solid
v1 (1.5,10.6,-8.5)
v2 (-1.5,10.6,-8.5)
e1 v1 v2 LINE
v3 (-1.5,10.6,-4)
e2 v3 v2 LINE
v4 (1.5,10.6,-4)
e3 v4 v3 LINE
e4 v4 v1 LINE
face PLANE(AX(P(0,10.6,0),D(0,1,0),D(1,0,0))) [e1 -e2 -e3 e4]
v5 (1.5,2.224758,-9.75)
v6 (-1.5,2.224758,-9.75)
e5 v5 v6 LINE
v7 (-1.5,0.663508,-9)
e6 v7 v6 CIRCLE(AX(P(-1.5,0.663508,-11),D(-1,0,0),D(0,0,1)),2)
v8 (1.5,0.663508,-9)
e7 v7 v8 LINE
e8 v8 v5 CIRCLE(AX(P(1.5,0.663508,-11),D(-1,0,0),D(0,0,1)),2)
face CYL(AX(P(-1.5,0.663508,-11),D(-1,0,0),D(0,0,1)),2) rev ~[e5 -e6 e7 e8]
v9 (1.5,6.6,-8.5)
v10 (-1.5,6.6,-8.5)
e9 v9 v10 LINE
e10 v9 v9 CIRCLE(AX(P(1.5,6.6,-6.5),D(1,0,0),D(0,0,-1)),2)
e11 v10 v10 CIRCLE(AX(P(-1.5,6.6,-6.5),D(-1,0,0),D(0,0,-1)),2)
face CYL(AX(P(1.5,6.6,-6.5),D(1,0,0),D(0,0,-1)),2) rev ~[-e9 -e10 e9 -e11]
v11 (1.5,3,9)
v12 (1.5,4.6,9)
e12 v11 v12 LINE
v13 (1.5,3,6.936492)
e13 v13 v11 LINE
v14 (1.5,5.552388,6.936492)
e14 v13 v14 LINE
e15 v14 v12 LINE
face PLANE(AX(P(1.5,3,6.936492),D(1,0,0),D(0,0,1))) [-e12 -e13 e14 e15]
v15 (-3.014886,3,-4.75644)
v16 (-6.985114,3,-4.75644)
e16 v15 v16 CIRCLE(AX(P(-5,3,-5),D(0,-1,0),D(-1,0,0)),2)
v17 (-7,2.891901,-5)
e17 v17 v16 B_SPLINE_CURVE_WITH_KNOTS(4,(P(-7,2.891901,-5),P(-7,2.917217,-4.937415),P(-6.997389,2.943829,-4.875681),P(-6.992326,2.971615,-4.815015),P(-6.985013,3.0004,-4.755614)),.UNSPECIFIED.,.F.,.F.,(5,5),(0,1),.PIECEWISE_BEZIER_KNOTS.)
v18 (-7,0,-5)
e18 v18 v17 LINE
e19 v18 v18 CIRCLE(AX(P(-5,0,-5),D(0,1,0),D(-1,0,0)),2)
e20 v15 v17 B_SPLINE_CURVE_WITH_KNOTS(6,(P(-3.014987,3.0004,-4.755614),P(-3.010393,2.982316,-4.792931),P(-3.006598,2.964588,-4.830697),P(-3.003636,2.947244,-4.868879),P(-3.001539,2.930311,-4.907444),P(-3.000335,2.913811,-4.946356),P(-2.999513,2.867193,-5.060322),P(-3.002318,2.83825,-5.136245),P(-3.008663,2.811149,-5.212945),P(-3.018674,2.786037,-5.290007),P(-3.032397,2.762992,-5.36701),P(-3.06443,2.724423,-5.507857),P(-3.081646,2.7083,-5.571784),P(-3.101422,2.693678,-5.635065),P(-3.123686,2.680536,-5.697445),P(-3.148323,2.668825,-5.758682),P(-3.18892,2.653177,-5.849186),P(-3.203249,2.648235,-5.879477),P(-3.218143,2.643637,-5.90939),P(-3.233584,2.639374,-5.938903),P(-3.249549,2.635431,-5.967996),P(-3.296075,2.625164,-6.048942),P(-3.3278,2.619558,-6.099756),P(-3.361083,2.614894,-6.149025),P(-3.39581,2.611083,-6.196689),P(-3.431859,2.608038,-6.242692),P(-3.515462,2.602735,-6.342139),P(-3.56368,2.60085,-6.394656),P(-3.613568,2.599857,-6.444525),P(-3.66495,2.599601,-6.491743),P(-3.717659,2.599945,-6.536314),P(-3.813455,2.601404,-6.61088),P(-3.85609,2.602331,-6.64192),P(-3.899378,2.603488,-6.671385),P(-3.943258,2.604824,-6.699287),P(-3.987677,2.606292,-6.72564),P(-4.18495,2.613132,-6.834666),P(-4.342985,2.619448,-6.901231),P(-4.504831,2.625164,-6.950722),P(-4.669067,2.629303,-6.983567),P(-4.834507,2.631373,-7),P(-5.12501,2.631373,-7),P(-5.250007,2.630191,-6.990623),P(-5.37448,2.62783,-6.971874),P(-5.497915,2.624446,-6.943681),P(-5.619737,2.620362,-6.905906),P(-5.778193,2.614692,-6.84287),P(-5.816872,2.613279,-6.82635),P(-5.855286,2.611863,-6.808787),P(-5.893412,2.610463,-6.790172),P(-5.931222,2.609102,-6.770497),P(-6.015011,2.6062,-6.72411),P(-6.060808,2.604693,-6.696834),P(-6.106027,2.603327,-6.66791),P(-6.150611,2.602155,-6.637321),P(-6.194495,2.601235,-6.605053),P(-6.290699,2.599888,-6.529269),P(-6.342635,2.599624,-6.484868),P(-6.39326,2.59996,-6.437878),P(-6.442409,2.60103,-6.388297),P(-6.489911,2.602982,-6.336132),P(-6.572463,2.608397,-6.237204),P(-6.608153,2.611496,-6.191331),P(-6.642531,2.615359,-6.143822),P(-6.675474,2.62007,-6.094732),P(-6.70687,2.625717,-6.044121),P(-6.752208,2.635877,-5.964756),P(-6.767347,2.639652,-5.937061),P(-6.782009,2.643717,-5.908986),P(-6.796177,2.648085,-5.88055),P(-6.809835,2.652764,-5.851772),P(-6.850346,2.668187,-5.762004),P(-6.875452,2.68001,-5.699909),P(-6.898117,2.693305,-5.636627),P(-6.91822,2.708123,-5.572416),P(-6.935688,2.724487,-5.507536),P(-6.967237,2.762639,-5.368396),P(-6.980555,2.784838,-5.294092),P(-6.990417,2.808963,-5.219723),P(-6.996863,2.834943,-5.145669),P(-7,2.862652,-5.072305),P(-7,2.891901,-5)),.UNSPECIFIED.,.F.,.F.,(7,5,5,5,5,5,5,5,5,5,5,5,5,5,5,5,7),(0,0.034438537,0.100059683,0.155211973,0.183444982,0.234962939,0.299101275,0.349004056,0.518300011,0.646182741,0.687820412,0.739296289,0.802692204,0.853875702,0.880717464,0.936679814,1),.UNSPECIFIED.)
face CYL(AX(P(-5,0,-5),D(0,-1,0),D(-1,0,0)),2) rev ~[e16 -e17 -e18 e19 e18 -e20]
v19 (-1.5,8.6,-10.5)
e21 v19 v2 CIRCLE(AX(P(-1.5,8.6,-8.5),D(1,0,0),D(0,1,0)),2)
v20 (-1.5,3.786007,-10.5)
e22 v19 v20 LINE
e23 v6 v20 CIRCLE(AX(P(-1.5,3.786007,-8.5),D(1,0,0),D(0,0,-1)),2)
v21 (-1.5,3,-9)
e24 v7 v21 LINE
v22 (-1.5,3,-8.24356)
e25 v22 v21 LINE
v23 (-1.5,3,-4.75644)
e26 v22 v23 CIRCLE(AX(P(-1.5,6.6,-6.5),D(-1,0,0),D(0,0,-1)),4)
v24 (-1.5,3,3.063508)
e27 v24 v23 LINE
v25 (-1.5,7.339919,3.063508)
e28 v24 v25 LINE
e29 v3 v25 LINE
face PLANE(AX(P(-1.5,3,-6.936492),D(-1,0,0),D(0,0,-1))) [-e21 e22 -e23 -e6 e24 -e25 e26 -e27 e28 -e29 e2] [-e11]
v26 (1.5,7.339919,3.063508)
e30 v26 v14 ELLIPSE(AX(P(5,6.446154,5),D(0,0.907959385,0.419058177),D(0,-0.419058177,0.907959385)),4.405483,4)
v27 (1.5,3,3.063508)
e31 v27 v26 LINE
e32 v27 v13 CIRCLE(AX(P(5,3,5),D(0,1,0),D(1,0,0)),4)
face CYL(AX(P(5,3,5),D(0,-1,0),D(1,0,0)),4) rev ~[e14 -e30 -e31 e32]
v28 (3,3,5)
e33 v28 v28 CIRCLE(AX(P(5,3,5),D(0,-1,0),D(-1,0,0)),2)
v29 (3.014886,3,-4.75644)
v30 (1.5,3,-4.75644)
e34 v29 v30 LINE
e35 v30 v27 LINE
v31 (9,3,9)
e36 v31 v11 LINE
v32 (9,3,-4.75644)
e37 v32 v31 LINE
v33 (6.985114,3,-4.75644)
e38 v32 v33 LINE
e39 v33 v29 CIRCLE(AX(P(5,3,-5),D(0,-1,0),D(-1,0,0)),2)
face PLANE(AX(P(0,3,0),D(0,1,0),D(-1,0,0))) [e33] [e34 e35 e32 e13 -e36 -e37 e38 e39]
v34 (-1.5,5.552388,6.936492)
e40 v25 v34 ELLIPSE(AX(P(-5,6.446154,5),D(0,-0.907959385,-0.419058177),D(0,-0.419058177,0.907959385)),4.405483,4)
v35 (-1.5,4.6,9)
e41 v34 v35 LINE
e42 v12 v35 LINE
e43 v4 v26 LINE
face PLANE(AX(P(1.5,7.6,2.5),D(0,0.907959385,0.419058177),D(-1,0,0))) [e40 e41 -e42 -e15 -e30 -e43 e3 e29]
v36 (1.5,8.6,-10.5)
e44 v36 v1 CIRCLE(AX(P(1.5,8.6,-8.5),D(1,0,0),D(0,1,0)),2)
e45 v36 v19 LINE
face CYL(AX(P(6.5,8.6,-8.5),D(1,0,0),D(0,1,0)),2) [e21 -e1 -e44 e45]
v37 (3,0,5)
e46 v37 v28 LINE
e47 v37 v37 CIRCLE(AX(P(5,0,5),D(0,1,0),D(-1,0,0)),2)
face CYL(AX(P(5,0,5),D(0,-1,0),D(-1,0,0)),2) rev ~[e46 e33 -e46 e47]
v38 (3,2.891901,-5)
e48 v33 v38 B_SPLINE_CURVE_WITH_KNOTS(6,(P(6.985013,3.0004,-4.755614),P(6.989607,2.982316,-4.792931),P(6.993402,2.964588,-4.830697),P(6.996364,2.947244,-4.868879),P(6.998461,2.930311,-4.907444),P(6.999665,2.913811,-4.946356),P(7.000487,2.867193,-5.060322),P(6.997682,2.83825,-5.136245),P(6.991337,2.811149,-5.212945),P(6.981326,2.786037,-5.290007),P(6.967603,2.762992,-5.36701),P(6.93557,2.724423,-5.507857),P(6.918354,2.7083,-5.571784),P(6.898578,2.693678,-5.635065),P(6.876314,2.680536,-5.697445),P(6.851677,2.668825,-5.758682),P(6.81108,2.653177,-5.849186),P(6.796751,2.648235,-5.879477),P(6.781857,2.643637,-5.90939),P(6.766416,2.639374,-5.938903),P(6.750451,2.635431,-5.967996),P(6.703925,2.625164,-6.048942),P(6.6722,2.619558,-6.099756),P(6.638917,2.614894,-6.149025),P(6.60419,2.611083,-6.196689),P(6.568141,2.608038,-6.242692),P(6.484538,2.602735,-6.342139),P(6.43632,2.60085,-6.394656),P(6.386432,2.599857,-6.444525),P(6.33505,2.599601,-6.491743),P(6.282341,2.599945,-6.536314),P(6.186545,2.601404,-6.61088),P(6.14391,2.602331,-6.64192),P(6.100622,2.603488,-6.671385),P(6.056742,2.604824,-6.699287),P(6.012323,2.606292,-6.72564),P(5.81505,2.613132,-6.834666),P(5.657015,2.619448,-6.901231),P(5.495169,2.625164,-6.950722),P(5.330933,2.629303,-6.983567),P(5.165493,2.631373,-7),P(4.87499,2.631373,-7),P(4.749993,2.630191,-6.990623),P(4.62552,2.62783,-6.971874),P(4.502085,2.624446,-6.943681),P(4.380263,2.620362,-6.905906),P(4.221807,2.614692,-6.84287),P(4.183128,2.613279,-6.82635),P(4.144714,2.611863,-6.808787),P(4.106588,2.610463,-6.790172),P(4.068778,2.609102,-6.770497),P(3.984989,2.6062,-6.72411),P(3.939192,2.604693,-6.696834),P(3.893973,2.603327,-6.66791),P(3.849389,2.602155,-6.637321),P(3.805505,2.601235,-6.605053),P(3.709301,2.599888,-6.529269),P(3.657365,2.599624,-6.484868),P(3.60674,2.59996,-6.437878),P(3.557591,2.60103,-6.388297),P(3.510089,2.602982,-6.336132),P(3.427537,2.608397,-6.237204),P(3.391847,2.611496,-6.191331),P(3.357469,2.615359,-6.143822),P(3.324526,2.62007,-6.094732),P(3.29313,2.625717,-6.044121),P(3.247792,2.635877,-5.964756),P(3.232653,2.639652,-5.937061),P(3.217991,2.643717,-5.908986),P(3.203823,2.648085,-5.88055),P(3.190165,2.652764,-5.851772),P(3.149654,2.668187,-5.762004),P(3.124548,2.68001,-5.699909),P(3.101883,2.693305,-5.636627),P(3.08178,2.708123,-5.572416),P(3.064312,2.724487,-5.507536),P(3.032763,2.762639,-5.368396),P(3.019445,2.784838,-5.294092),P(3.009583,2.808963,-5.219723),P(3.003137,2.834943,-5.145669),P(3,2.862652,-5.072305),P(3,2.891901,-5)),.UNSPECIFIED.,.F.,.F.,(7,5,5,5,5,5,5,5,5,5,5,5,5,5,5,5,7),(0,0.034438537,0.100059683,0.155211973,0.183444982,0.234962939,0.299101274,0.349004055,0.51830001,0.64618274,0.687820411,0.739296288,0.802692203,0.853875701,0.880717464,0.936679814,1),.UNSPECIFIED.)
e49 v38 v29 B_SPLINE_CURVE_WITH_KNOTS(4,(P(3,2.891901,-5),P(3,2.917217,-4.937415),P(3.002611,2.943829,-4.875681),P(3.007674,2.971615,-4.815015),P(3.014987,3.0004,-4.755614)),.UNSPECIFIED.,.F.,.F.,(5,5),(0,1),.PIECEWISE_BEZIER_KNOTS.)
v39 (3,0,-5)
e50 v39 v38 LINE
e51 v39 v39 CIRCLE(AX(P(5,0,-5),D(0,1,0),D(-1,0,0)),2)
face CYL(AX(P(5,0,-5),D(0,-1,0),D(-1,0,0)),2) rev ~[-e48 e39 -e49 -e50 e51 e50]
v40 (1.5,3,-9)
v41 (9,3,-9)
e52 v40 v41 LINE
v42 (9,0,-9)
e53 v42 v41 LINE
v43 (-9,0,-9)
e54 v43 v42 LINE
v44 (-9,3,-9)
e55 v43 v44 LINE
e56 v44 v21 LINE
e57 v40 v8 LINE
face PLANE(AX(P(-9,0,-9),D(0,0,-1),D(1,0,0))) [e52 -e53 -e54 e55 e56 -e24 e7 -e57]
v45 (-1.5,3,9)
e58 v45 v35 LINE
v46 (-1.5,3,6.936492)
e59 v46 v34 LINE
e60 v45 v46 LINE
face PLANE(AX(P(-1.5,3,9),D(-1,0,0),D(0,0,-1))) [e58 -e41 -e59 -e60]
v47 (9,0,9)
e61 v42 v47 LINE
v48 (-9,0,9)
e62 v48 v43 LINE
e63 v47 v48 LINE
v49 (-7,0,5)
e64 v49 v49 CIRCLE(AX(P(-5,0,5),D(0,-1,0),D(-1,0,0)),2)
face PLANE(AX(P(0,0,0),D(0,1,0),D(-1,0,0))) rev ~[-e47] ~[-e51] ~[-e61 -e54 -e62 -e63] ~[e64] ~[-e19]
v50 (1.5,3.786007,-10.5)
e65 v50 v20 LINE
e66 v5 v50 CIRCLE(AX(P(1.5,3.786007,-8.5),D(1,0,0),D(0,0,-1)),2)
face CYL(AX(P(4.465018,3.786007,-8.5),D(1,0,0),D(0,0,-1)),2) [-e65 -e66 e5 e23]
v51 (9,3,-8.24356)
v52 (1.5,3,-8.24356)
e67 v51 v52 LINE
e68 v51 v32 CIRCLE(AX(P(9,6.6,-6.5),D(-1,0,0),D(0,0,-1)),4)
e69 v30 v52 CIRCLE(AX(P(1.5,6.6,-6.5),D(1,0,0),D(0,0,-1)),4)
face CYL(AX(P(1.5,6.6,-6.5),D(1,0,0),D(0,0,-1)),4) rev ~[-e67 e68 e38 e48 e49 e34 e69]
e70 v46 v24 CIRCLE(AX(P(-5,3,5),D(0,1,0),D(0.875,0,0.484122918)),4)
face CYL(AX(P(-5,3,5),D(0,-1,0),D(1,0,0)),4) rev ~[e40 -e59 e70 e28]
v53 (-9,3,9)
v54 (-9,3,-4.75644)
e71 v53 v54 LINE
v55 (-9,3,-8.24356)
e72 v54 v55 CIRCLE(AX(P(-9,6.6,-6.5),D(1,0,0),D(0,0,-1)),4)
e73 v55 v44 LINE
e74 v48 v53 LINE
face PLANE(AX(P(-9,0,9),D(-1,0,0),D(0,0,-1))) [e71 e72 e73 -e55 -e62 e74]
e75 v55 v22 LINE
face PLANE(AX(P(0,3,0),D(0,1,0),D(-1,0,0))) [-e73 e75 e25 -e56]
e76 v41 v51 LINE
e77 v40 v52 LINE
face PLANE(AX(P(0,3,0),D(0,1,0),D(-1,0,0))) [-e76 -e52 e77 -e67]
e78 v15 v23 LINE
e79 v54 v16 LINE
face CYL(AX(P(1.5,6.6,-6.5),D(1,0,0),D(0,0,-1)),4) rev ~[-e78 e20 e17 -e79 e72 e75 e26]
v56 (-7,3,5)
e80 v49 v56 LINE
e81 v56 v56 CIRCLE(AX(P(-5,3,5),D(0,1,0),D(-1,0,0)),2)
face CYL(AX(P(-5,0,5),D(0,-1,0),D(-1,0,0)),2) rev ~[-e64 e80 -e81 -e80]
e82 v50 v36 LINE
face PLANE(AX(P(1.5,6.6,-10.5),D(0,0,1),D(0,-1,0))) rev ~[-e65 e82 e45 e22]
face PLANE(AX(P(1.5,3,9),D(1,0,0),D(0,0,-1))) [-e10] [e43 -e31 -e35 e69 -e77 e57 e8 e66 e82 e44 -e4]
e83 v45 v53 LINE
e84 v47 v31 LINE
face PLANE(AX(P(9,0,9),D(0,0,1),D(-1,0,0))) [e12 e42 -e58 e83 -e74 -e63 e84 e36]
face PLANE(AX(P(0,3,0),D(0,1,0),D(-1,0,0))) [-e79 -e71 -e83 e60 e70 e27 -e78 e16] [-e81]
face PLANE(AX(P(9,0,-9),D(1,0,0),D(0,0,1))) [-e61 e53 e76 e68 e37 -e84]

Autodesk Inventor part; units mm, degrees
ref_plane "YZ Plane" through (0, 0, 0) normal (1, 0, 0) x (0, 1, 0)
ref_plane "XZ Plane" through (0, 0, 0) normal (0, 1, 0) x (-1, 0, 0)
ref_plane "XY Plane" through (0, 0, 0) normal (0, 0, 1) x (1, 0, 0)
sketch "Sketch1" plane through (0, 0, 0) normal (0, 1, 0) x (-1, 0, 0)
  line L0 (-5, 5) -> (5, 5)
  line L1 (5, 5) -> (5, -5)
  line L2 (5, -5) -> (-5, -5)
  line L3 (-5, -5) -> (-5, 5)
  line L4 (-5, 5) -> (5, -5) construction
  line L5 (5, 5) -> (-5, -5) construction
  line L6 (-9, 9) -> (9, 9)
  line L7 (9, 9) -> (9, -9)
  line L8 (9, -9) -> (-9, -9)
  line L9 (-9, -9) -> (-9, 9)
  line L10 (-9, 9) -> (9, -9) construction
  line L11 (9, 9) -> (-9, -9) construction
  circle A0 centre (5, 5) radius 2
  circle A1 centre (-5, 5) radius 2
  circle A2 centre (5, -5) radius 2
  circle A3 centre (-5, -5) radius 2
  point P0 (0, 0)
  dimension "d0" = 10
  dimension "d1" = 10
  dimension "d2" = 18
  dimension "d3" = 18
  dimension "d4" = 4
  dimension "d5" = 4
  dimension "d6" = 4
  dimension "d7" = 4
extrude "Extrusion1" add sketch "Sketch1" along normal blind 3 contours L0 A0 L1 A2 L2 A3 L3 A1 | L6 L7 L8 L9
sketch "Sketch2" plane through (0, 3, 0) normal (0, 1, 0) x (1, 0, 0)
  line L0 (9, 9) -> (-9, 9) projected
  line L1 (1.5, -9) -> (-1.5, -9)
  line L2 (-1.5, -9) -> (-1.5, 9)
  line L3 (-1.5, 9) -> (1.5, 9)
  line L4 (1.5, 9) -> (1.5, -9)
  line L5 (1.5, -9) -> (-1.5, 9) construction
  line L6 (-1.5, -9) -> (1.5, 9) construction
  circle A0 centre (-5, -5) radius 2 projected
  circle A1 centre (-5, -5) radius 4
  circle A2 centre (-5, 5) radius 2 projected
  circle A3 centre (-5, 5) radius 4
  circle A4 centre (5, -5) radius 2 projected
  circle A5 centre (5, -5) radius 4
  circle A6 centre (5, 5) radius 2 projected
  circle A7 centre (5, 5) radius 4
  point P0 (0, 0)
  point P1 (1.5, -6.9365)
  point P2 (1.5, -3.0635)
  point P3 (1.5, 3.0635)
  point P4 (1.5, 6.9365)
  point P5 (-1.5, 6.9365)
  point P6 (-1.5, 3.0635)
  point P7 (-1.5, -3.0635)
  point P8 (-1.5, -6.9365)
  dimension "d10" = 3
  dimension "d11" = 8
  dimension "d12" = 8
  dimension "d13" = 8
  dimension "d14" = 8
extrude "Extrusion2" add sketch "Sketch2" along normal blind 7.6 contours L4 A7 A5 L1 L2 A1 A3 L0
sketch "Sketch3" plane through (1.5, 3, 9) normal (1, 0, 0) x (0, 0, -1)
  line L0 (0, -3) -> (0, 0) projected
  line L1 (0, -3) -> (0, 3.6)
  line L2 (0, 3.6) -> (18, 3.6)
  line L3 (18, 0) -> (18, 7.6) projected
  line L4 (18, 3.6) -> (15.5, 3.6)
  circle A0 centre (15.5, 3.6) radius 2
  circle A1 centre (15.5, 3.6) radius 4
  line L5 (19.5, -0.4) -> (11.5, -0.4)
  line L6 (11.5, -0.4) -> (11.5, 7.6)
  line L7 (11.5, 7.6) -> (19.5, 7.6)
  line L8 (19.5, 7.6) -> (19.5, -0.4)
  line L9 (19.5, -0.4) -> (11.5, 7.6) construction
  line L10 (11.5, -0.4) -> (19.5, 7.6) construction
  point P0 (9, -3)
  dimension "d17" = 6.6
  dimension "d18" = 2.5
  dimension "d19" = 4
  dimension "d20" = 8
extrude "Extrusion3" add sketch "Sketch3" against normal up to surface (3 mm away)
extrude "Extrusion4" cut sketch "Sketch3" against normal blind 10 contours L2 A0 | L2 A0
extrude "Extrusion5" cut sketch "Sketch3" along normal blind 10 contours L2 A0 | L2 A0 | A0 L2 A1 L3 | L2 L3 A1 A0 | L3 A1
extrude "Extrusion6" cut sketch "Sketch3" against normal blind 20 contours L2 A0 | L2 A0 | A0 L2 A1 L3 | L2 L3 A1 A0 | L3 A1
extrude "Extrusion7" add sketch "Sketch3" against normal up to surface (3 mm away) contours A0 L2 A1 L3 | L2 L3 A1 A0 | L3 A1
chamfer "Chamfer1" distance 13 distance2 6 1 edges at (0, 10.6, 9) measured on face at (-0.5, 10.6, -5.9788)
fillet "Fillet1" radius 2 3 edges at (0, 10.6, -10.5) (0, 2.6, -10.5) (0, 2.6, -9)
properties part number "link2"
